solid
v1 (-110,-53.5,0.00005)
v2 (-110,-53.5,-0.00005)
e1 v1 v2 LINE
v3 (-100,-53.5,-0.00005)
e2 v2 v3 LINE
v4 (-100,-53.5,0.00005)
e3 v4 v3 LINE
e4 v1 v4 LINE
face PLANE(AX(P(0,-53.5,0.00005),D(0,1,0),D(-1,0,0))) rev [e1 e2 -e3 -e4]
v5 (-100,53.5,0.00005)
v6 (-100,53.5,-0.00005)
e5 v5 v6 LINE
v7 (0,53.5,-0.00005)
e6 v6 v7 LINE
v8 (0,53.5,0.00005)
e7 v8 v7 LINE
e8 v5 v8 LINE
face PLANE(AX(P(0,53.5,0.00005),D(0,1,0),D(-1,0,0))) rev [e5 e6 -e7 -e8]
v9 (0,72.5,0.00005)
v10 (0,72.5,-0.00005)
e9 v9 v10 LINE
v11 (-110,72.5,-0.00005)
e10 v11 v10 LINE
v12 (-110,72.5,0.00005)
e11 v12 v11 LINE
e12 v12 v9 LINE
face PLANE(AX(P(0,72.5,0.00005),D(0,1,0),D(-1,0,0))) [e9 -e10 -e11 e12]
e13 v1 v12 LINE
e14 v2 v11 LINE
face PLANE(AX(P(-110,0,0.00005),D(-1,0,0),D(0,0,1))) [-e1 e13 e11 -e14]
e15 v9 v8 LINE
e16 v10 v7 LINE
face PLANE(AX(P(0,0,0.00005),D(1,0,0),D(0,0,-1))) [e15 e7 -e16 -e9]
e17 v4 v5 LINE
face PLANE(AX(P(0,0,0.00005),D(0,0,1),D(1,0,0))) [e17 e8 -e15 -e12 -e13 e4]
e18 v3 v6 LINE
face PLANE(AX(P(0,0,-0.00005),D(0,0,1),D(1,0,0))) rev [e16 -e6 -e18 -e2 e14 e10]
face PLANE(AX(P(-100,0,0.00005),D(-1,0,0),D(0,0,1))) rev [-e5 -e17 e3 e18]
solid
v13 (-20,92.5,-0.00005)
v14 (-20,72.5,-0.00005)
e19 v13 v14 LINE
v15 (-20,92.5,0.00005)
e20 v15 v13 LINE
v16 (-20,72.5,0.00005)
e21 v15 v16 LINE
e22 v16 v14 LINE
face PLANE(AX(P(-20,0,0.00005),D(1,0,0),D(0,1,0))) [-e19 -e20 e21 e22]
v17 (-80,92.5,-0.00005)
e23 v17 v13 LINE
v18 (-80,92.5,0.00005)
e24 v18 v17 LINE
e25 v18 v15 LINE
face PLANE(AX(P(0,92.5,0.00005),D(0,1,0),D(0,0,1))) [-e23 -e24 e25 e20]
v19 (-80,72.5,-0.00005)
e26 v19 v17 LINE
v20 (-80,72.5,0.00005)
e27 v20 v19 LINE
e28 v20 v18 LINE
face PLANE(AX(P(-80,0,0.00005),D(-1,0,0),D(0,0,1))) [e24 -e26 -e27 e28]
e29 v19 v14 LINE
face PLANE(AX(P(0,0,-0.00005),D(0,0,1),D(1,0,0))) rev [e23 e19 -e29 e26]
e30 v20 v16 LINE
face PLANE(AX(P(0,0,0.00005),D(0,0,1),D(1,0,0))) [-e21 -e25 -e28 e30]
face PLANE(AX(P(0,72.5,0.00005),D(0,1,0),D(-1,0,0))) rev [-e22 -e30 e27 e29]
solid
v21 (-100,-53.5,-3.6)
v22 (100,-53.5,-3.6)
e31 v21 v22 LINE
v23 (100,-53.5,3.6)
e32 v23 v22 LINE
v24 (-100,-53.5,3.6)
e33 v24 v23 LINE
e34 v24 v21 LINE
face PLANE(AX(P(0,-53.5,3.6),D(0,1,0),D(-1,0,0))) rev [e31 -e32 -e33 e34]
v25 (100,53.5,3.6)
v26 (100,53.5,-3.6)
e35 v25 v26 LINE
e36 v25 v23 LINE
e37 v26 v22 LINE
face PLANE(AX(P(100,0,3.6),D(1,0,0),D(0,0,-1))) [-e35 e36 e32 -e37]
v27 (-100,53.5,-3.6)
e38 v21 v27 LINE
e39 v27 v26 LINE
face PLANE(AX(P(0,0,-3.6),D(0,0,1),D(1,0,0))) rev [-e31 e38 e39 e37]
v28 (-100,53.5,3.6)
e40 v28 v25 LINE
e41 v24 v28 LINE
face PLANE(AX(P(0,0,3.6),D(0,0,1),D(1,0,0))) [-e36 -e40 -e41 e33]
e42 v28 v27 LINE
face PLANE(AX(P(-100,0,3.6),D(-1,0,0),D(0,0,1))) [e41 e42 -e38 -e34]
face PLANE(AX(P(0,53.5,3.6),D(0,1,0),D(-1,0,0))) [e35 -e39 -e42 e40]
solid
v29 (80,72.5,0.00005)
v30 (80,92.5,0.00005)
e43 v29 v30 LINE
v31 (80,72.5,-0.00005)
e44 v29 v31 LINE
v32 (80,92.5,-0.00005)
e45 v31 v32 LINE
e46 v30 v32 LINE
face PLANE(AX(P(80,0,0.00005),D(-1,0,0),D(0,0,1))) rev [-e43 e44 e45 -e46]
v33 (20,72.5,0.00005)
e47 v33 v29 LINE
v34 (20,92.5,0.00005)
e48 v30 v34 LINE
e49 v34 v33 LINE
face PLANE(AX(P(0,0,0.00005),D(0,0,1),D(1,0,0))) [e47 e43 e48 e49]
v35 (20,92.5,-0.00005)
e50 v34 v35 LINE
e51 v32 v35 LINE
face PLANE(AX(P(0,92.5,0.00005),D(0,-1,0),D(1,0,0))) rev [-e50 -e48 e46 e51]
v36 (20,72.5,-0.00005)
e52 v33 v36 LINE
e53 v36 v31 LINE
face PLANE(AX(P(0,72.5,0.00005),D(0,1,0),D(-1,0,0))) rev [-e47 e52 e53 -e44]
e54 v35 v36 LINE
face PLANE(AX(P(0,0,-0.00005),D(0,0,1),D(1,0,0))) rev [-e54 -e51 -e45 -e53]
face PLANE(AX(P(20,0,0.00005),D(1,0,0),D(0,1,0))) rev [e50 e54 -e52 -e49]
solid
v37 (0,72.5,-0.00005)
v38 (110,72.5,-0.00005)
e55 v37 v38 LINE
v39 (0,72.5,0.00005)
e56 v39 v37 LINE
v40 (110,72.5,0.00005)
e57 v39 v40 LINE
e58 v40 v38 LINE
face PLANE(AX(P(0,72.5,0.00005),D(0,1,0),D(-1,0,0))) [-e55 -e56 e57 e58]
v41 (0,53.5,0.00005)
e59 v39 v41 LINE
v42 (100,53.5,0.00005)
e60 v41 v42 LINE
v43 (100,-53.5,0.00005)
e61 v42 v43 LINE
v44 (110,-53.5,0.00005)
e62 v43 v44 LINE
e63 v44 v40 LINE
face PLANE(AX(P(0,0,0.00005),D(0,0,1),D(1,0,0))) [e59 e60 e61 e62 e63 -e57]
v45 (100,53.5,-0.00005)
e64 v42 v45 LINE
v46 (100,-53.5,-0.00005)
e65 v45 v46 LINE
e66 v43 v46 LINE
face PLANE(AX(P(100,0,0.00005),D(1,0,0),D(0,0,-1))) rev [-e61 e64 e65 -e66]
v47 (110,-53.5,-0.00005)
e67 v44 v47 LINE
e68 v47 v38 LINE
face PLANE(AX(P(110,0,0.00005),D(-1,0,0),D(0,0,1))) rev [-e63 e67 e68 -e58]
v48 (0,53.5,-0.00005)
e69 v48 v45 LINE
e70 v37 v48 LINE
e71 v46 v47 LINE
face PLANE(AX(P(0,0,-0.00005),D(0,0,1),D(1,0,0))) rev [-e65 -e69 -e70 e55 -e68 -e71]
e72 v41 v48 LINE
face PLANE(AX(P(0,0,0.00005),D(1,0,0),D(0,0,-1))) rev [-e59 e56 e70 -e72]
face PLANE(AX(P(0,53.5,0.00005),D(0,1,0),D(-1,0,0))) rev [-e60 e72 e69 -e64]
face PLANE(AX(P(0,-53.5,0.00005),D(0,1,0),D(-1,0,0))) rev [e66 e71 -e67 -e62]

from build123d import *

# Parameters (mm, degrees)
BOSS_EXTRUDE1_DEPTH   = 3.6
MINUS_ISOLATION_START = -5e-05
MINUS_ISOLATION_DEPTH = 0.0001
PLUS_ISOLATION_DEPTH  = 5e-05
SKETCH1_4_W           = 60
SKETCH1_4_H           = 20
PLUS_DEPTH            = 5e-05
SKETCH1_5_W           = 60
SKETCH1_5_H           = 20
MINUS_DEPTH           = 5e-05


# Read off the part's stored shape, not the designer's step: minus_isolation
with BuildPart() as part:
    # Sketch1 → Boss-Extrude1 (new, symmetric)
    with BuildSketch(Plane.XY):
        Polygon((-100, 53.5), (-100, -53.5), (100, -53.5), (100, 53.5), (0, 53.5), align=None)
    extrude(amount=BOSS_EXTRUDE1_DEPTH, both=True)


with BuildPart() as body_2:
    # minus_isolation outline → minus_isolation (new body)
    with BuildSketch(Plane.XY.offset(MINUS_ISOLATION_START)):
        Polygon((110, -53.5), (110, 72.5), (0, 72.5), (0, 53.5), (100, 53.5), (100, -53.5), align=None)
    extrude(amount=MINUS_ISOLATION_DEPTH)


with BuildPart() as body_3:
    # Sketch1<6> → plus_isolation (new, symmetric)
    with BuildSketch(Plane.XY):
        Polygon((-110, 72.5), (-110, -53.5), (-100, -53.5), (-100, 53.5), (0, 53.5), (0, 72.5), (-20, 72.5), (-80, 72.5), align=None)
    extrude(amount=PLUS_ISOLATION_DEPTH, both=True)


with BuildPart() as body_4:
    # Sketch1<4> → plus (new, symmetric)
    with BuildSketch(Plane.XY):
        with Locations((-50, 82.5)):
            Rectangle(SKETCH1_4_W, SKETCH1_4_H)
    extrude(amount=PLUS_DEPTH, both=True)


with BuildPart() as body_5:
    # Sketch1<5> → minus (new, symmetric)
    with BuildSketch(Plane.XY):
        with Locations((50, 82.5)):
            Rectangle(SKETCH1_5_W, SKETCH1_5_H)
    extrude(amount=MINUS_DEPTH, both=True)


solid = Compound([part.part, body_2.part, body_3.part, body_4.part, body_5.part])
